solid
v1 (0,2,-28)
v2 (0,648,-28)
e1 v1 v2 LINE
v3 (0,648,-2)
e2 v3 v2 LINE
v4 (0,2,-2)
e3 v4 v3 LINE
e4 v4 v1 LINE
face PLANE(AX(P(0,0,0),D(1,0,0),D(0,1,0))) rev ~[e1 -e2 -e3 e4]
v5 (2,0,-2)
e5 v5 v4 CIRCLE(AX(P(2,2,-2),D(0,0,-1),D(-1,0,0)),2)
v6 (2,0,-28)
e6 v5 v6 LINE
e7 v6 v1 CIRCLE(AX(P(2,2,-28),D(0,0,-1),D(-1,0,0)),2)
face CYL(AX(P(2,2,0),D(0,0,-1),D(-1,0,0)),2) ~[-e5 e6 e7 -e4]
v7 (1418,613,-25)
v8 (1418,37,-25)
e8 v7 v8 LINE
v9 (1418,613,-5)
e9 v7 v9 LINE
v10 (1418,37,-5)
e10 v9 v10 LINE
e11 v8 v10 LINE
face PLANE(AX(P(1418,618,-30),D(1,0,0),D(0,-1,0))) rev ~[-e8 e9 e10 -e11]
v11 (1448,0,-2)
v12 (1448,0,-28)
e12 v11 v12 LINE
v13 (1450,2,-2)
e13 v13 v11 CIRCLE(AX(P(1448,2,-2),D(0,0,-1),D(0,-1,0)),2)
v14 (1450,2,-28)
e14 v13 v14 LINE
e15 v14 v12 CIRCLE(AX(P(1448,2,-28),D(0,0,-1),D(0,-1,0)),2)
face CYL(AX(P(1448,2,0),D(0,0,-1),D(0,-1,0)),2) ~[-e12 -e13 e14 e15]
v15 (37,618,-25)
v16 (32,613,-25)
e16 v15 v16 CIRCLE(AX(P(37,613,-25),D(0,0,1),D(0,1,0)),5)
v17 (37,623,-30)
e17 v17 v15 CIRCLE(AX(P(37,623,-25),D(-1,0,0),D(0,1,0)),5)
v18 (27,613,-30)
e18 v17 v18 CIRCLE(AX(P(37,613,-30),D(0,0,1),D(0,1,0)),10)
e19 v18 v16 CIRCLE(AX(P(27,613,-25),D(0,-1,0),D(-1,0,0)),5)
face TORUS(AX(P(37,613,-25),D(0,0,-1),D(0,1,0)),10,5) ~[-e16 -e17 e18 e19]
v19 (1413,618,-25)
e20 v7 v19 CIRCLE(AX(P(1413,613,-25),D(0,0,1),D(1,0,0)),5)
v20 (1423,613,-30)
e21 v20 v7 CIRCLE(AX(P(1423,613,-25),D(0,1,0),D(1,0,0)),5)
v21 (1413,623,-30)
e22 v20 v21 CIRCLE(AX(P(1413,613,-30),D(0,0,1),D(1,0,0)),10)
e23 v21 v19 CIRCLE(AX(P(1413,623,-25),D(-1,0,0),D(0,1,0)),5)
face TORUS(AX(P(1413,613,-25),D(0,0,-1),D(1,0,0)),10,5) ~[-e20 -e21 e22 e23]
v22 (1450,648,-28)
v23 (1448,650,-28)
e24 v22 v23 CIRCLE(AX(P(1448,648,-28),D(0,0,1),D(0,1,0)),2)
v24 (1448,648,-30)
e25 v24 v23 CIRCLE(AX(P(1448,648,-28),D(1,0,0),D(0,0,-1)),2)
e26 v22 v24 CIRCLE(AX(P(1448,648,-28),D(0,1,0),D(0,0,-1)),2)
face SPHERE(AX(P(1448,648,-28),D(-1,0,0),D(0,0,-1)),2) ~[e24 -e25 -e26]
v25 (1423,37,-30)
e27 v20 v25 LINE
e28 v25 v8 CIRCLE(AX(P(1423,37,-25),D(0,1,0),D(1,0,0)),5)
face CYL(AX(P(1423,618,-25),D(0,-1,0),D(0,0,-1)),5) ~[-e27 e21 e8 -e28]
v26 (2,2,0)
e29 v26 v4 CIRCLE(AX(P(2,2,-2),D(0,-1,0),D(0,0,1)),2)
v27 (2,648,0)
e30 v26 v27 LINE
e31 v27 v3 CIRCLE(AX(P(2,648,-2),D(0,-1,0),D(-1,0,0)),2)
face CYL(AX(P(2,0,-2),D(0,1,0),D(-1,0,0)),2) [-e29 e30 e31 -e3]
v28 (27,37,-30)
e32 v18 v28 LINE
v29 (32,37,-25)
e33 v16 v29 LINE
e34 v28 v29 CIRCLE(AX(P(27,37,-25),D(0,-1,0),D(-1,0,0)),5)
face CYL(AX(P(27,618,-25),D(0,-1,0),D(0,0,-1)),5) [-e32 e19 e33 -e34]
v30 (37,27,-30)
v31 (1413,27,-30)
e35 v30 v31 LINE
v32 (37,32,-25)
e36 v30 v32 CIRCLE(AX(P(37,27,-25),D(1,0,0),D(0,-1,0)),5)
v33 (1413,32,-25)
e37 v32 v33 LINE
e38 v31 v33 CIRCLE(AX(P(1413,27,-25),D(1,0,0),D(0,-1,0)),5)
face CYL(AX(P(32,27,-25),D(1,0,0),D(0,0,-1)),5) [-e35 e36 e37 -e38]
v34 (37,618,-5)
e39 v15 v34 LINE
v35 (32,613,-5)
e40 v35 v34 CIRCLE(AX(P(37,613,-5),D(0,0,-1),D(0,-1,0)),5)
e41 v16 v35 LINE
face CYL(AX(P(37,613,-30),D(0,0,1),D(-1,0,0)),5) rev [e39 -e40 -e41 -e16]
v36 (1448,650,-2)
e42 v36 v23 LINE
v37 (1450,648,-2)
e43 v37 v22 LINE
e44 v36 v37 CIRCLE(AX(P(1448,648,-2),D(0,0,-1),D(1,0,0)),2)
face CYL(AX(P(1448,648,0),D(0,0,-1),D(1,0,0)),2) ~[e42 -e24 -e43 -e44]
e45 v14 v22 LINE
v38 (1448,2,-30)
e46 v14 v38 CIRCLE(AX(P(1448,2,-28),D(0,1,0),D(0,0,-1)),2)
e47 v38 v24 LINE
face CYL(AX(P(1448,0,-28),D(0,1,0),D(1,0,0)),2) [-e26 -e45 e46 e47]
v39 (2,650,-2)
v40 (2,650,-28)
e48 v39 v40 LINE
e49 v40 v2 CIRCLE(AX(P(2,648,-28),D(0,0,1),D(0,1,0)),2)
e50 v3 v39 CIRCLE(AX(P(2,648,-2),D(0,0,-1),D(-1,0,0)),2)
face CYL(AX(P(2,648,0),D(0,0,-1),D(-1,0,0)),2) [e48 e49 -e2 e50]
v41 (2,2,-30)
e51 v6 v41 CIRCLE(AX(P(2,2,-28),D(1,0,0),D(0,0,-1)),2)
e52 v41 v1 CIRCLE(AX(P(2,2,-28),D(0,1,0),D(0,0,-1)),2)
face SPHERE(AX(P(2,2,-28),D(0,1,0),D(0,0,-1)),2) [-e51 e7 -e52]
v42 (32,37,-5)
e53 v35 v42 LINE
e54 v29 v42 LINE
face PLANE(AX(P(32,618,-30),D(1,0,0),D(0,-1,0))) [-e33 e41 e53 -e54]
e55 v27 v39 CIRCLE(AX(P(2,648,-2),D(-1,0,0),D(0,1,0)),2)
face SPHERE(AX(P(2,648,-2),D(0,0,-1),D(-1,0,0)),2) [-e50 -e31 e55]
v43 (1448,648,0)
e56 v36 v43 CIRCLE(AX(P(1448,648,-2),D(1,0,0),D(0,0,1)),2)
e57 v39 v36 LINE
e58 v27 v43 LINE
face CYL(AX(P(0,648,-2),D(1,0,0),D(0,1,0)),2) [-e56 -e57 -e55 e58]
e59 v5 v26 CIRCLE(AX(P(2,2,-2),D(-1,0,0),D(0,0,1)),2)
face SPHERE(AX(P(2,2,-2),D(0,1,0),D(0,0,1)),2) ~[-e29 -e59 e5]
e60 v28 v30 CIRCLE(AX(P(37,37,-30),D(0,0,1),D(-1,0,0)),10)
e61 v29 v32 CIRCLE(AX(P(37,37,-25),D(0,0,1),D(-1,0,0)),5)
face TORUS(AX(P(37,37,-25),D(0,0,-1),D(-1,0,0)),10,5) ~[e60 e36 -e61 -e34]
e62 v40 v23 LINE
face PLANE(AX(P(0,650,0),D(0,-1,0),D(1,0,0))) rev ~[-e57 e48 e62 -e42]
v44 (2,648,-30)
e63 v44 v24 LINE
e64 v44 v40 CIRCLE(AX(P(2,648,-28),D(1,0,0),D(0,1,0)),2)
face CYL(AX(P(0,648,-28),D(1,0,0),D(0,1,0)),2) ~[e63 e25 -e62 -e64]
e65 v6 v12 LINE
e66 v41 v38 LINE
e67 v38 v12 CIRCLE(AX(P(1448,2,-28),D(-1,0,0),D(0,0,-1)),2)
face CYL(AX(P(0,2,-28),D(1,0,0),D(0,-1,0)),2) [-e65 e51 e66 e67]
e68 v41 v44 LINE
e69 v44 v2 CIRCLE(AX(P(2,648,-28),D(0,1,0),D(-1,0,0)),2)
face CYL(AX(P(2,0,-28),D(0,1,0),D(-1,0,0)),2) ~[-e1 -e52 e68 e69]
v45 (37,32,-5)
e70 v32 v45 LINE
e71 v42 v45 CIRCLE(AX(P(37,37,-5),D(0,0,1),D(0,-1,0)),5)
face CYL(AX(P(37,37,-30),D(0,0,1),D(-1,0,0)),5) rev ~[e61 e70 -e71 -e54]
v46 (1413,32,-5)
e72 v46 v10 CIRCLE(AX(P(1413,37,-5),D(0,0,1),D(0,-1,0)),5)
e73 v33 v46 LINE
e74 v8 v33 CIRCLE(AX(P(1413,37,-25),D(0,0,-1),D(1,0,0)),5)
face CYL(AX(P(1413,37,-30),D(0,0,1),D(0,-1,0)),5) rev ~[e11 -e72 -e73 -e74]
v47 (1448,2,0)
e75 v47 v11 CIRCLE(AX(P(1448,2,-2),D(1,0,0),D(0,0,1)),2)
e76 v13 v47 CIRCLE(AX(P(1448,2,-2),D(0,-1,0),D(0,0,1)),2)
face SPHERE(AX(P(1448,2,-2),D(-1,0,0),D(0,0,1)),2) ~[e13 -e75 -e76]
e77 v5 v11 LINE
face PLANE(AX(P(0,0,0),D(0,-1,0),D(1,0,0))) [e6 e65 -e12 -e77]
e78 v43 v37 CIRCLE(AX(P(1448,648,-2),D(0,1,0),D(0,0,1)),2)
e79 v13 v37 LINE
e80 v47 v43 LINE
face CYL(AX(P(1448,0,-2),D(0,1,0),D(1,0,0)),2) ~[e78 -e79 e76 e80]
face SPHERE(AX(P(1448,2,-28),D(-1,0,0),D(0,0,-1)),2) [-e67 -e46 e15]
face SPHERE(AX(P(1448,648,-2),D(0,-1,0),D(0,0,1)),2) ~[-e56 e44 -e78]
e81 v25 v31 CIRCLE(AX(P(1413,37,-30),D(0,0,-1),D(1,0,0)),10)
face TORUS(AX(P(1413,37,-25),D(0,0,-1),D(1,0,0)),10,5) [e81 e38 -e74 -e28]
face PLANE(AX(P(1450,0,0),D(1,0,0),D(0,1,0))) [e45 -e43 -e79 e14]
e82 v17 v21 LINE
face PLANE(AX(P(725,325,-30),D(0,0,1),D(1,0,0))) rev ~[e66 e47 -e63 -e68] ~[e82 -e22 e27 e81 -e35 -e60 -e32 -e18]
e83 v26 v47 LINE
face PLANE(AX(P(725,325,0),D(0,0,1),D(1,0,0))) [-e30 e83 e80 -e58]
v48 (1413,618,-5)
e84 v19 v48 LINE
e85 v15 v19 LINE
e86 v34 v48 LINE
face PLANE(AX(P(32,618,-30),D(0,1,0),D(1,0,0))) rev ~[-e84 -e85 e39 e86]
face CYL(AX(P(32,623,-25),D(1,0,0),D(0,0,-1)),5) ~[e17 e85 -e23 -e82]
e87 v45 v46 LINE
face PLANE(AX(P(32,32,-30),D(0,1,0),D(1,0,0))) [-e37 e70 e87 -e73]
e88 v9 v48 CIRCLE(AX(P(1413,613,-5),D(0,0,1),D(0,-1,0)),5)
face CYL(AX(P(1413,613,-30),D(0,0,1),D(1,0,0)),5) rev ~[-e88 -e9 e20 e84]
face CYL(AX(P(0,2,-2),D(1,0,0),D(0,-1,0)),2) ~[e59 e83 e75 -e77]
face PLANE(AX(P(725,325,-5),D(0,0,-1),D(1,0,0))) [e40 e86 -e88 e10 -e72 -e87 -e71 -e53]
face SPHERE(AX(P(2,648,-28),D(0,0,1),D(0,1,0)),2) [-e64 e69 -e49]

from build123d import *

# Parameters (mm, degrees)
F0_W     = 1450
F0_H     = 650
F1_DEPTH = 30
F2_R     = 2
F3_W     = 1386
F3_H     = 586
F4_DEPTH = 25
F5_R     = 5


with BuildPart() as f1:
    # F0 (on Top) → F1 (new body)
    with BuildSketch(Plane.XY):
        with Locations((725, 325)):
            Rectangle(F0_W, F0_H)
    extrude(amount=-F1_DEPTH)

    # F2
    f2_edges = [f1.edges().sort_by_distance(p)[0] for p in [
        (0, 650, -15),
        (725, 650, -30),
        (0, 325, -30),
        (725, 0, -30),
        (1450, 325, -30),
        (0, 325, 0),
        (725, 0, 0),
        (1450, 325, 0),
        (725, 650, 0),
        (0, 0, -15),
        (1450, 0, -15),
        (1450, 650, -15),
    ]]
    fillet(f2_edges, radius=F2_R)

    # F3 (on face) → F4 (cut)
    with BuildSketch(Plane(origin=(0, 0, -30), x_dir=(1, 0, 0), z_dir=(0, 0, -1))):
        with Locations((725, -325)):
            Rectangle(F3_W, F3_H)
    extrude(amount=-F4_DEPTH, mode=Mode.SUBTRACT)

    # F5
    f5_edges = [f1.edges().sort_by_distance(p)[0] for p in [
        (1418, 618, -17.5),
        (1418, 32, -17.5),
        (32, 32, -17.5),
        (32, 325, -30),
        (1418, 325, -30),
        (32, 618, -17.5),
        (725, 618, -30),
        (725, 32, -30),
    ]]
    fillet(f5_edges, radius=F5_R)


solid = f1.part
